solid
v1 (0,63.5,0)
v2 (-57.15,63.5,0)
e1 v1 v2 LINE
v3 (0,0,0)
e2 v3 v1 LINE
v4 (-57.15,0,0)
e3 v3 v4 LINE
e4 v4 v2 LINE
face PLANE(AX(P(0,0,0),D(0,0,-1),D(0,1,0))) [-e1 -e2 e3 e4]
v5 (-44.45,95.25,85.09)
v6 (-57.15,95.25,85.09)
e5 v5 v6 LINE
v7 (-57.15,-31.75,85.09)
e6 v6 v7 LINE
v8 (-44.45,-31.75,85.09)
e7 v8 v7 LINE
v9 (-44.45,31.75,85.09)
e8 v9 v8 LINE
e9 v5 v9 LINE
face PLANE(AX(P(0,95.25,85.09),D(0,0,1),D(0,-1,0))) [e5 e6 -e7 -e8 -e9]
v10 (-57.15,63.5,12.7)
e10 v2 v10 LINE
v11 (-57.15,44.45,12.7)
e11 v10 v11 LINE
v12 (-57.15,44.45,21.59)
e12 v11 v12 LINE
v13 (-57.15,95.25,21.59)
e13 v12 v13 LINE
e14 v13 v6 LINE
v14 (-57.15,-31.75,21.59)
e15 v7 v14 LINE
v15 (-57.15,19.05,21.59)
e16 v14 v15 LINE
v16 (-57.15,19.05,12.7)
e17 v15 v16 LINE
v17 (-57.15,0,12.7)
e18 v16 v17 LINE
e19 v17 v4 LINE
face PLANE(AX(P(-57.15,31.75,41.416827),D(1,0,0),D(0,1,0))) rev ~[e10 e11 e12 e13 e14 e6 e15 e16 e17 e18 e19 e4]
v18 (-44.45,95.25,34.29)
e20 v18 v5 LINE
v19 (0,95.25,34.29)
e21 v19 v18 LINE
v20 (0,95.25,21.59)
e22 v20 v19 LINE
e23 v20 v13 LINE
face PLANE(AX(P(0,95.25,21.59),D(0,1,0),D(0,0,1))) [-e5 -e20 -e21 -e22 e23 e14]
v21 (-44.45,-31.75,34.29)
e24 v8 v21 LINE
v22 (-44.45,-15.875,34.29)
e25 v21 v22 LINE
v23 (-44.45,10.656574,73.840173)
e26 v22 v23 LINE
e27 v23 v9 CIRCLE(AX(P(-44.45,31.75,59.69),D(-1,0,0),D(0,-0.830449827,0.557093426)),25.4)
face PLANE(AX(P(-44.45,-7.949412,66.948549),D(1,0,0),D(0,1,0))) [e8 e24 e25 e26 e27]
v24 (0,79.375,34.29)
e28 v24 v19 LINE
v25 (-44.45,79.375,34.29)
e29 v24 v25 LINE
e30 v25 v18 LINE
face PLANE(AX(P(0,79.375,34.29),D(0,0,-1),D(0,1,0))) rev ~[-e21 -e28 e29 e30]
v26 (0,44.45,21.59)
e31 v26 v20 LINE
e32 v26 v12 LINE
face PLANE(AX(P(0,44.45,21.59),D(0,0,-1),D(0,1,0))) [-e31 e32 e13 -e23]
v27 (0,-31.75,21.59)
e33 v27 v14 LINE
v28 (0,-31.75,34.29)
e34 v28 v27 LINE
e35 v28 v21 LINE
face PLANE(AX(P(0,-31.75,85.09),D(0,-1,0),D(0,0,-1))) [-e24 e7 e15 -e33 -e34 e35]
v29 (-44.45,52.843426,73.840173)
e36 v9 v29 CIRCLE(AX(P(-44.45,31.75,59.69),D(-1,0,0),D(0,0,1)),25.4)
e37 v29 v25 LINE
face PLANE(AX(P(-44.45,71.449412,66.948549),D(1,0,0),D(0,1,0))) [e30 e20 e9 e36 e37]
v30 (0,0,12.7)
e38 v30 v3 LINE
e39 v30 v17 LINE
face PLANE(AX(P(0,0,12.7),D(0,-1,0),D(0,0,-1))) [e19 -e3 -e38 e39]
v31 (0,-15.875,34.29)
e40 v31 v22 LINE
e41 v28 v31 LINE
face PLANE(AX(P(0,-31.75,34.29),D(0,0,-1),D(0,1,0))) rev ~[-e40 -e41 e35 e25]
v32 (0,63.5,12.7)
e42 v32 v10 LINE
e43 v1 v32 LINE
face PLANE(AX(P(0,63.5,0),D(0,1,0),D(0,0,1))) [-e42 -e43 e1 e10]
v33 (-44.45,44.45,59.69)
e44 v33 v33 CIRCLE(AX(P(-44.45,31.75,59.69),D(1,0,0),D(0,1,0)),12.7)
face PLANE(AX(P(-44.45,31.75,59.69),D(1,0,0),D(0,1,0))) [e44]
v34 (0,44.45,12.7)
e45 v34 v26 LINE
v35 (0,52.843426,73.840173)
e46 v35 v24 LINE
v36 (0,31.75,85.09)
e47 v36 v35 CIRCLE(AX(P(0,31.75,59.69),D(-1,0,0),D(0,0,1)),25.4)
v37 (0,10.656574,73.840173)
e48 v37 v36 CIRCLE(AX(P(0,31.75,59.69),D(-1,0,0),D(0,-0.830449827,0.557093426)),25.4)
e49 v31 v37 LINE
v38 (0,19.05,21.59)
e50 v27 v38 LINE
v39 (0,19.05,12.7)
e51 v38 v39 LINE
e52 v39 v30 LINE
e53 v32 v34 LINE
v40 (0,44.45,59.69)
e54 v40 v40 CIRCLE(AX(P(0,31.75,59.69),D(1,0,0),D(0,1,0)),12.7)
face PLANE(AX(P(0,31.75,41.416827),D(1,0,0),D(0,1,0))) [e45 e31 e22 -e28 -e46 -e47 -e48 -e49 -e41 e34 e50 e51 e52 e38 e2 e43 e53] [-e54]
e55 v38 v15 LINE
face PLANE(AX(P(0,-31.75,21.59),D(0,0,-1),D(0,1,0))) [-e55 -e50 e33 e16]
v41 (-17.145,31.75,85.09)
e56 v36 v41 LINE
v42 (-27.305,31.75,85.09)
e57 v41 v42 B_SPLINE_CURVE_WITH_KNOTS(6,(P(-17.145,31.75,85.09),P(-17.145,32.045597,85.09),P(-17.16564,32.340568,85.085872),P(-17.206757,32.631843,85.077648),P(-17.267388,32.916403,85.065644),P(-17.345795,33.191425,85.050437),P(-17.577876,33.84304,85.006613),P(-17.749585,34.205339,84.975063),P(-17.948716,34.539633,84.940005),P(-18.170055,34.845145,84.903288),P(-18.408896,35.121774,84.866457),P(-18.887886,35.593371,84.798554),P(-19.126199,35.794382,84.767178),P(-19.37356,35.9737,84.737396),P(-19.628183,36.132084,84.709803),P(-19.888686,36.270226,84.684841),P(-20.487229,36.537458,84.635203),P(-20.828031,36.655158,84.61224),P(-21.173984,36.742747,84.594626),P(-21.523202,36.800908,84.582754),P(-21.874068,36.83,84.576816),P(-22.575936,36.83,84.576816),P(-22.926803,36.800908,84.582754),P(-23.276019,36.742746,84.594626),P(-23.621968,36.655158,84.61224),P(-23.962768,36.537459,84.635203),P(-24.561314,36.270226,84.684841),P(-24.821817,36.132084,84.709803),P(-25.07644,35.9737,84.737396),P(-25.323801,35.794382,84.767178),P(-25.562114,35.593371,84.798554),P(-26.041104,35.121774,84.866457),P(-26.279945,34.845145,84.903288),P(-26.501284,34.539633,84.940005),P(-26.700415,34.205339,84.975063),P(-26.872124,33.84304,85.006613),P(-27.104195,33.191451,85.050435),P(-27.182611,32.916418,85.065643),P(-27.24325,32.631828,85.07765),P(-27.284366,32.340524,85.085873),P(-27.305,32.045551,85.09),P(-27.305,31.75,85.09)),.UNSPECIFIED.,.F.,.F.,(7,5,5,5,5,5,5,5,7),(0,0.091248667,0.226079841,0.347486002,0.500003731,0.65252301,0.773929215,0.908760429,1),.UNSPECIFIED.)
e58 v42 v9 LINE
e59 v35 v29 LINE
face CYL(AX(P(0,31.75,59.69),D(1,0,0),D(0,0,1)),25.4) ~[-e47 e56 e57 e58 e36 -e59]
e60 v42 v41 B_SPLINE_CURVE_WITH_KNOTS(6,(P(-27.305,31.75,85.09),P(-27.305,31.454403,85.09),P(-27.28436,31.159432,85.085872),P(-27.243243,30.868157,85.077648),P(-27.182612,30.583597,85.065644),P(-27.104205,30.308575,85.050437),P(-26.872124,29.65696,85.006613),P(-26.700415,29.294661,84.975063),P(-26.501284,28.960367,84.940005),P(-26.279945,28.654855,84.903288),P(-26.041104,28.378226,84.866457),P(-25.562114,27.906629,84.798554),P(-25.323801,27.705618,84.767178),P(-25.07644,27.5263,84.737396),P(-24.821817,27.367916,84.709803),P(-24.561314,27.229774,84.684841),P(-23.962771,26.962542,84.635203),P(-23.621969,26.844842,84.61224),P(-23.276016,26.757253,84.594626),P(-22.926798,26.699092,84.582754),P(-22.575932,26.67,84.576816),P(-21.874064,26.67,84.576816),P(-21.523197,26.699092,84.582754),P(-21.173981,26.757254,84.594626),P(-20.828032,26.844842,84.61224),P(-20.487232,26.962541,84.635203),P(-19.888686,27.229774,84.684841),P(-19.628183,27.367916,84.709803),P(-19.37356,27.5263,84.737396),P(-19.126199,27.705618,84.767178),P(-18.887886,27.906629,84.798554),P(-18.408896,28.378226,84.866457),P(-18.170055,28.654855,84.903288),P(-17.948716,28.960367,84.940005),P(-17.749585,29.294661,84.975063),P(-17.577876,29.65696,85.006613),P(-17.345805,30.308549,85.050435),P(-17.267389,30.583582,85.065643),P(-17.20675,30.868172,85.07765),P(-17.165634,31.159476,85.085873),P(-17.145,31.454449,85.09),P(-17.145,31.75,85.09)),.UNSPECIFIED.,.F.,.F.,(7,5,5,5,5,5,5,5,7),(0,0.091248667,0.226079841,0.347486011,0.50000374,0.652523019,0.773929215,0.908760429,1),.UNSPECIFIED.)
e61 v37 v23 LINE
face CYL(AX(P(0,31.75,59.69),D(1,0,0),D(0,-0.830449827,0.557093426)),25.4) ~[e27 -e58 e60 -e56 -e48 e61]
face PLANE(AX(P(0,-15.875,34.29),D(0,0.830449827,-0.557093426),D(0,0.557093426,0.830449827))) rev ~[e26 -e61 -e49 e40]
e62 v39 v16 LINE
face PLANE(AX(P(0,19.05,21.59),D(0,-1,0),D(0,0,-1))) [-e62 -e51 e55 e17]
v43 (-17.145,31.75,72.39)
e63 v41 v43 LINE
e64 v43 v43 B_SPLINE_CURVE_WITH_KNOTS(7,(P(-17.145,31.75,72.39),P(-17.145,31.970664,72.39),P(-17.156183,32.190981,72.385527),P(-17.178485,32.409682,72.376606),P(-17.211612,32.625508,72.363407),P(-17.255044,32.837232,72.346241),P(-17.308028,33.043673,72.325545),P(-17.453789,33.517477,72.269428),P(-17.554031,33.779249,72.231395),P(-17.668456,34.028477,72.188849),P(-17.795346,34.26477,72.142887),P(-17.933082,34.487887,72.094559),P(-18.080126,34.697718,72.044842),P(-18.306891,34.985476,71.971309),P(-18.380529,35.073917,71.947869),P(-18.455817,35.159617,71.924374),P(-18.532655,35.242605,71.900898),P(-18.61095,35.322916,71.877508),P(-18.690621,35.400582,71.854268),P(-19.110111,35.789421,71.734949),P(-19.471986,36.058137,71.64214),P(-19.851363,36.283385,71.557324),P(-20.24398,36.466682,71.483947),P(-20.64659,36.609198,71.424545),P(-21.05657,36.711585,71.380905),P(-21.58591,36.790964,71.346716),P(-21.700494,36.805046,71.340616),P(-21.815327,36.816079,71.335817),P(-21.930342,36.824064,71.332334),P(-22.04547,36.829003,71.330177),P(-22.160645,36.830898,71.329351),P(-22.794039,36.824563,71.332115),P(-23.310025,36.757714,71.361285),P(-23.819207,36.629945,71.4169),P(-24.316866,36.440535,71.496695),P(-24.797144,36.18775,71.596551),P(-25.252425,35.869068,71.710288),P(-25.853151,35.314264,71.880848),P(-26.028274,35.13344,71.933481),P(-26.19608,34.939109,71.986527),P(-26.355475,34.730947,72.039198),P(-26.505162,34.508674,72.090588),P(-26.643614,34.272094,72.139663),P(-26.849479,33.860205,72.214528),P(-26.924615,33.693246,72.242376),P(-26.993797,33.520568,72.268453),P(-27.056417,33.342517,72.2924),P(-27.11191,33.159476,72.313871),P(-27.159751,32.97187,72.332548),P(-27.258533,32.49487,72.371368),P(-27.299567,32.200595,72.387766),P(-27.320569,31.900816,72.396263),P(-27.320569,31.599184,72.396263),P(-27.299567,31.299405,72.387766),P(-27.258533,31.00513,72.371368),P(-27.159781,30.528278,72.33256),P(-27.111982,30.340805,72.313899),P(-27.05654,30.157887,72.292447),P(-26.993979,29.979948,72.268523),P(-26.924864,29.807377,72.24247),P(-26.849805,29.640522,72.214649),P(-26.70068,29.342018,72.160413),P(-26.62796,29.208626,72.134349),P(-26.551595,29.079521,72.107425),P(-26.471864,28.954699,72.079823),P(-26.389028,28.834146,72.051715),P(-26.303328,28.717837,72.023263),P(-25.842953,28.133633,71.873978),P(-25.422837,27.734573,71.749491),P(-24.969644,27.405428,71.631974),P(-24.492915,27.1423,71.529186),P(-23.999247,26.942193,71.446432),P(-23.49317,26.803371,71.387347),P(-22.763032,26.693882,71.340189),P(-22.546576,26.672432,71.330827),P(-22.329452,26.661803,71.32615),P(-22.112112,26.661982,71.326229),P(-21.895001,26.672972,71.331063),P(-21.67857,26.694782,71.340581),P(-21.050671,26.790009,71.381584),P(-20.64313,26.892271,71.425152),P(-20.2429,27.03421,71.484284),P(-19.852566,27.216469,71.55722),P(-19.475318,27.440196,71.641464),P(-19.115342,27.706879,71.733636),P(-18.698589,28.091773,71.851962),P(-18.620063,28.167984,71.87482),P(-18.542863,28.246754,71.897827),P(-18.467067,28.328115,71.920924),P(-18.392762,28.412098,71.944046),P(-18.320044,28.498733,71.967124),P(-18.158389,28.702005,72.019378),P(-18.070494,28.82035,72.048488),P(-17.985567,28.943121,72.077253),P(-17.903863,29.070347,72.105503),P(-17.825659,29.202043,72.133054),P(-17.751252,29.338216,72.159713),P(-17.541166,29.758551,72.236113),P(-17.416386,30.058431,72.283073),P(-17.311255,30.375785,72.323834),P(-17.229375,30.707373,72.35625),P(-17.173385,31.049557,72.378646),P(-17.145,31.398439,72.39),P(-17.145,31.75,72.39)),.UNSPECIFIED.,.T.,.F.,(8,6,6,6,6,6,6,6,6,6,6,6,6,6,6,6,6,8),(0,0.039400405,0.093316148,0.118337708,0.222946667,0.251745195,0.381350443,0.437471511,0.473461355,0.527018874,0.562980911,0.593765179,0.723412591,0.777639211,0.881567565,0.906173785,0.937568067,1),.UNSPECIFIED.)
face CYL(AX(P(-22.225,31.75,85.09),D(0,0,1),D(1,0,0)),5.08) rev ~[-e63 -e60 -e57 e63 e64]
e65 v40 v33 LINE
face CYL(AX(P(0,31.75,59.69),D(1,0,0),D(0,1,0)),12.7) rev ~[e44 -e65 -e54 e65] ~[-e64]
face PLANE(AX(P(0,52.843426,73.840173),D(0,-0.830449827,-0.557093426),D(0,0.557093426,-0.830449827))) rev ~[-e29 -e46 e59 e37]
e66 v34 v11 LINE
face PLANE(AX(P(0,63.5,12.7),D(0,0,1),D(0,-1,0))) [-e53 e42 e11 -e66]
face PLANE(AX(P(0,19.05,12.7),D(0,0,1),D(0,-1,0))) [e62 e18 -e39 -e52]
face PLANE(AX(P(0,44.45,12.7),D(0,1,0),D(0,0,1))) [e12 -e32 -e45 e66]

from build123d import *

# Parameters (mm, degrees)
F1_DEPTH = 57.15
F3_DEPTH = 44.45
F4_R     = 12.7
F5_DEPTH = 44.45
F8_R     = 5.08
F9_DEPTH = 25.4


with BuildPart() as f1:
    # F0 (on Right) → F1 (new body)
    with BuildSketch(Plane.YZ):
        Polygon((0, 12.7), (0, 0), (63.5, 0), (63.5, 12.7), (44.45, 12.7), (44.45, 21.59), (95.25, 21.59), (95.25, 85.09), (-31.75, 85.09), (-31.75, 21.59), (19.05, 21.59), (19.05, 12.7), align=None)
    extrude(amount=-F1_DEPTH)

    # F2 (on face) → F3 (cut)
    with BuildSketch(Plane.YZ):
        with BuildLine():
            Line((-31.75, 85.09), (-31.75, 34.29))
            Line((-31.75, 34.29), (-15.875, 34.29))
            Line((-15.875, 34.29), (10.6565743945, 73.8401730104))
            ThreePointArc((10.6565743945, 73.8401730104), (19.7970588235, 82.1017647059), (31.75, 85.09))
            Line((31.75, 85.09), (-31.75, 85.09))
        make_face()
        with BuildLine():
            Line((95.25, 85.09), (31.75, 85.09))
            ThreePointArc((31.75, 85.09), (43.7029411765, 82.1017647059), (52.8434256055, 73.8401730104))
            Line((52.8434256055, 73.8401730104), (79.375, 34.29))
            Line((79.375, 34.29), (95.25, 34.29))
            Line((95.25, 34.29), (95.25, 85.09))
        make_face()
    extrude(amount=-F3_DEPTH, mode=Mode.SUBTRACT)

    # F4 (on face) → F5 (cut)
    with BuildSketch(Plane.YZ):
        with Locations((31.75, 59.69)):
            Circle(F4_R)
    extrude(amount=-F5_DEPTH, mode=Mode.SUBTRACT)

    # F8 (on offset) → F9 (cut)
    with BuildSketch(Plane.XY.offset(85.09)):
        with Locations((-22.225, 31.75)):
            Circle(F8_R)
    extrude(amount=-F9_DEPTH, mode=Mode.SUBTRACT)


solid = f1.part
